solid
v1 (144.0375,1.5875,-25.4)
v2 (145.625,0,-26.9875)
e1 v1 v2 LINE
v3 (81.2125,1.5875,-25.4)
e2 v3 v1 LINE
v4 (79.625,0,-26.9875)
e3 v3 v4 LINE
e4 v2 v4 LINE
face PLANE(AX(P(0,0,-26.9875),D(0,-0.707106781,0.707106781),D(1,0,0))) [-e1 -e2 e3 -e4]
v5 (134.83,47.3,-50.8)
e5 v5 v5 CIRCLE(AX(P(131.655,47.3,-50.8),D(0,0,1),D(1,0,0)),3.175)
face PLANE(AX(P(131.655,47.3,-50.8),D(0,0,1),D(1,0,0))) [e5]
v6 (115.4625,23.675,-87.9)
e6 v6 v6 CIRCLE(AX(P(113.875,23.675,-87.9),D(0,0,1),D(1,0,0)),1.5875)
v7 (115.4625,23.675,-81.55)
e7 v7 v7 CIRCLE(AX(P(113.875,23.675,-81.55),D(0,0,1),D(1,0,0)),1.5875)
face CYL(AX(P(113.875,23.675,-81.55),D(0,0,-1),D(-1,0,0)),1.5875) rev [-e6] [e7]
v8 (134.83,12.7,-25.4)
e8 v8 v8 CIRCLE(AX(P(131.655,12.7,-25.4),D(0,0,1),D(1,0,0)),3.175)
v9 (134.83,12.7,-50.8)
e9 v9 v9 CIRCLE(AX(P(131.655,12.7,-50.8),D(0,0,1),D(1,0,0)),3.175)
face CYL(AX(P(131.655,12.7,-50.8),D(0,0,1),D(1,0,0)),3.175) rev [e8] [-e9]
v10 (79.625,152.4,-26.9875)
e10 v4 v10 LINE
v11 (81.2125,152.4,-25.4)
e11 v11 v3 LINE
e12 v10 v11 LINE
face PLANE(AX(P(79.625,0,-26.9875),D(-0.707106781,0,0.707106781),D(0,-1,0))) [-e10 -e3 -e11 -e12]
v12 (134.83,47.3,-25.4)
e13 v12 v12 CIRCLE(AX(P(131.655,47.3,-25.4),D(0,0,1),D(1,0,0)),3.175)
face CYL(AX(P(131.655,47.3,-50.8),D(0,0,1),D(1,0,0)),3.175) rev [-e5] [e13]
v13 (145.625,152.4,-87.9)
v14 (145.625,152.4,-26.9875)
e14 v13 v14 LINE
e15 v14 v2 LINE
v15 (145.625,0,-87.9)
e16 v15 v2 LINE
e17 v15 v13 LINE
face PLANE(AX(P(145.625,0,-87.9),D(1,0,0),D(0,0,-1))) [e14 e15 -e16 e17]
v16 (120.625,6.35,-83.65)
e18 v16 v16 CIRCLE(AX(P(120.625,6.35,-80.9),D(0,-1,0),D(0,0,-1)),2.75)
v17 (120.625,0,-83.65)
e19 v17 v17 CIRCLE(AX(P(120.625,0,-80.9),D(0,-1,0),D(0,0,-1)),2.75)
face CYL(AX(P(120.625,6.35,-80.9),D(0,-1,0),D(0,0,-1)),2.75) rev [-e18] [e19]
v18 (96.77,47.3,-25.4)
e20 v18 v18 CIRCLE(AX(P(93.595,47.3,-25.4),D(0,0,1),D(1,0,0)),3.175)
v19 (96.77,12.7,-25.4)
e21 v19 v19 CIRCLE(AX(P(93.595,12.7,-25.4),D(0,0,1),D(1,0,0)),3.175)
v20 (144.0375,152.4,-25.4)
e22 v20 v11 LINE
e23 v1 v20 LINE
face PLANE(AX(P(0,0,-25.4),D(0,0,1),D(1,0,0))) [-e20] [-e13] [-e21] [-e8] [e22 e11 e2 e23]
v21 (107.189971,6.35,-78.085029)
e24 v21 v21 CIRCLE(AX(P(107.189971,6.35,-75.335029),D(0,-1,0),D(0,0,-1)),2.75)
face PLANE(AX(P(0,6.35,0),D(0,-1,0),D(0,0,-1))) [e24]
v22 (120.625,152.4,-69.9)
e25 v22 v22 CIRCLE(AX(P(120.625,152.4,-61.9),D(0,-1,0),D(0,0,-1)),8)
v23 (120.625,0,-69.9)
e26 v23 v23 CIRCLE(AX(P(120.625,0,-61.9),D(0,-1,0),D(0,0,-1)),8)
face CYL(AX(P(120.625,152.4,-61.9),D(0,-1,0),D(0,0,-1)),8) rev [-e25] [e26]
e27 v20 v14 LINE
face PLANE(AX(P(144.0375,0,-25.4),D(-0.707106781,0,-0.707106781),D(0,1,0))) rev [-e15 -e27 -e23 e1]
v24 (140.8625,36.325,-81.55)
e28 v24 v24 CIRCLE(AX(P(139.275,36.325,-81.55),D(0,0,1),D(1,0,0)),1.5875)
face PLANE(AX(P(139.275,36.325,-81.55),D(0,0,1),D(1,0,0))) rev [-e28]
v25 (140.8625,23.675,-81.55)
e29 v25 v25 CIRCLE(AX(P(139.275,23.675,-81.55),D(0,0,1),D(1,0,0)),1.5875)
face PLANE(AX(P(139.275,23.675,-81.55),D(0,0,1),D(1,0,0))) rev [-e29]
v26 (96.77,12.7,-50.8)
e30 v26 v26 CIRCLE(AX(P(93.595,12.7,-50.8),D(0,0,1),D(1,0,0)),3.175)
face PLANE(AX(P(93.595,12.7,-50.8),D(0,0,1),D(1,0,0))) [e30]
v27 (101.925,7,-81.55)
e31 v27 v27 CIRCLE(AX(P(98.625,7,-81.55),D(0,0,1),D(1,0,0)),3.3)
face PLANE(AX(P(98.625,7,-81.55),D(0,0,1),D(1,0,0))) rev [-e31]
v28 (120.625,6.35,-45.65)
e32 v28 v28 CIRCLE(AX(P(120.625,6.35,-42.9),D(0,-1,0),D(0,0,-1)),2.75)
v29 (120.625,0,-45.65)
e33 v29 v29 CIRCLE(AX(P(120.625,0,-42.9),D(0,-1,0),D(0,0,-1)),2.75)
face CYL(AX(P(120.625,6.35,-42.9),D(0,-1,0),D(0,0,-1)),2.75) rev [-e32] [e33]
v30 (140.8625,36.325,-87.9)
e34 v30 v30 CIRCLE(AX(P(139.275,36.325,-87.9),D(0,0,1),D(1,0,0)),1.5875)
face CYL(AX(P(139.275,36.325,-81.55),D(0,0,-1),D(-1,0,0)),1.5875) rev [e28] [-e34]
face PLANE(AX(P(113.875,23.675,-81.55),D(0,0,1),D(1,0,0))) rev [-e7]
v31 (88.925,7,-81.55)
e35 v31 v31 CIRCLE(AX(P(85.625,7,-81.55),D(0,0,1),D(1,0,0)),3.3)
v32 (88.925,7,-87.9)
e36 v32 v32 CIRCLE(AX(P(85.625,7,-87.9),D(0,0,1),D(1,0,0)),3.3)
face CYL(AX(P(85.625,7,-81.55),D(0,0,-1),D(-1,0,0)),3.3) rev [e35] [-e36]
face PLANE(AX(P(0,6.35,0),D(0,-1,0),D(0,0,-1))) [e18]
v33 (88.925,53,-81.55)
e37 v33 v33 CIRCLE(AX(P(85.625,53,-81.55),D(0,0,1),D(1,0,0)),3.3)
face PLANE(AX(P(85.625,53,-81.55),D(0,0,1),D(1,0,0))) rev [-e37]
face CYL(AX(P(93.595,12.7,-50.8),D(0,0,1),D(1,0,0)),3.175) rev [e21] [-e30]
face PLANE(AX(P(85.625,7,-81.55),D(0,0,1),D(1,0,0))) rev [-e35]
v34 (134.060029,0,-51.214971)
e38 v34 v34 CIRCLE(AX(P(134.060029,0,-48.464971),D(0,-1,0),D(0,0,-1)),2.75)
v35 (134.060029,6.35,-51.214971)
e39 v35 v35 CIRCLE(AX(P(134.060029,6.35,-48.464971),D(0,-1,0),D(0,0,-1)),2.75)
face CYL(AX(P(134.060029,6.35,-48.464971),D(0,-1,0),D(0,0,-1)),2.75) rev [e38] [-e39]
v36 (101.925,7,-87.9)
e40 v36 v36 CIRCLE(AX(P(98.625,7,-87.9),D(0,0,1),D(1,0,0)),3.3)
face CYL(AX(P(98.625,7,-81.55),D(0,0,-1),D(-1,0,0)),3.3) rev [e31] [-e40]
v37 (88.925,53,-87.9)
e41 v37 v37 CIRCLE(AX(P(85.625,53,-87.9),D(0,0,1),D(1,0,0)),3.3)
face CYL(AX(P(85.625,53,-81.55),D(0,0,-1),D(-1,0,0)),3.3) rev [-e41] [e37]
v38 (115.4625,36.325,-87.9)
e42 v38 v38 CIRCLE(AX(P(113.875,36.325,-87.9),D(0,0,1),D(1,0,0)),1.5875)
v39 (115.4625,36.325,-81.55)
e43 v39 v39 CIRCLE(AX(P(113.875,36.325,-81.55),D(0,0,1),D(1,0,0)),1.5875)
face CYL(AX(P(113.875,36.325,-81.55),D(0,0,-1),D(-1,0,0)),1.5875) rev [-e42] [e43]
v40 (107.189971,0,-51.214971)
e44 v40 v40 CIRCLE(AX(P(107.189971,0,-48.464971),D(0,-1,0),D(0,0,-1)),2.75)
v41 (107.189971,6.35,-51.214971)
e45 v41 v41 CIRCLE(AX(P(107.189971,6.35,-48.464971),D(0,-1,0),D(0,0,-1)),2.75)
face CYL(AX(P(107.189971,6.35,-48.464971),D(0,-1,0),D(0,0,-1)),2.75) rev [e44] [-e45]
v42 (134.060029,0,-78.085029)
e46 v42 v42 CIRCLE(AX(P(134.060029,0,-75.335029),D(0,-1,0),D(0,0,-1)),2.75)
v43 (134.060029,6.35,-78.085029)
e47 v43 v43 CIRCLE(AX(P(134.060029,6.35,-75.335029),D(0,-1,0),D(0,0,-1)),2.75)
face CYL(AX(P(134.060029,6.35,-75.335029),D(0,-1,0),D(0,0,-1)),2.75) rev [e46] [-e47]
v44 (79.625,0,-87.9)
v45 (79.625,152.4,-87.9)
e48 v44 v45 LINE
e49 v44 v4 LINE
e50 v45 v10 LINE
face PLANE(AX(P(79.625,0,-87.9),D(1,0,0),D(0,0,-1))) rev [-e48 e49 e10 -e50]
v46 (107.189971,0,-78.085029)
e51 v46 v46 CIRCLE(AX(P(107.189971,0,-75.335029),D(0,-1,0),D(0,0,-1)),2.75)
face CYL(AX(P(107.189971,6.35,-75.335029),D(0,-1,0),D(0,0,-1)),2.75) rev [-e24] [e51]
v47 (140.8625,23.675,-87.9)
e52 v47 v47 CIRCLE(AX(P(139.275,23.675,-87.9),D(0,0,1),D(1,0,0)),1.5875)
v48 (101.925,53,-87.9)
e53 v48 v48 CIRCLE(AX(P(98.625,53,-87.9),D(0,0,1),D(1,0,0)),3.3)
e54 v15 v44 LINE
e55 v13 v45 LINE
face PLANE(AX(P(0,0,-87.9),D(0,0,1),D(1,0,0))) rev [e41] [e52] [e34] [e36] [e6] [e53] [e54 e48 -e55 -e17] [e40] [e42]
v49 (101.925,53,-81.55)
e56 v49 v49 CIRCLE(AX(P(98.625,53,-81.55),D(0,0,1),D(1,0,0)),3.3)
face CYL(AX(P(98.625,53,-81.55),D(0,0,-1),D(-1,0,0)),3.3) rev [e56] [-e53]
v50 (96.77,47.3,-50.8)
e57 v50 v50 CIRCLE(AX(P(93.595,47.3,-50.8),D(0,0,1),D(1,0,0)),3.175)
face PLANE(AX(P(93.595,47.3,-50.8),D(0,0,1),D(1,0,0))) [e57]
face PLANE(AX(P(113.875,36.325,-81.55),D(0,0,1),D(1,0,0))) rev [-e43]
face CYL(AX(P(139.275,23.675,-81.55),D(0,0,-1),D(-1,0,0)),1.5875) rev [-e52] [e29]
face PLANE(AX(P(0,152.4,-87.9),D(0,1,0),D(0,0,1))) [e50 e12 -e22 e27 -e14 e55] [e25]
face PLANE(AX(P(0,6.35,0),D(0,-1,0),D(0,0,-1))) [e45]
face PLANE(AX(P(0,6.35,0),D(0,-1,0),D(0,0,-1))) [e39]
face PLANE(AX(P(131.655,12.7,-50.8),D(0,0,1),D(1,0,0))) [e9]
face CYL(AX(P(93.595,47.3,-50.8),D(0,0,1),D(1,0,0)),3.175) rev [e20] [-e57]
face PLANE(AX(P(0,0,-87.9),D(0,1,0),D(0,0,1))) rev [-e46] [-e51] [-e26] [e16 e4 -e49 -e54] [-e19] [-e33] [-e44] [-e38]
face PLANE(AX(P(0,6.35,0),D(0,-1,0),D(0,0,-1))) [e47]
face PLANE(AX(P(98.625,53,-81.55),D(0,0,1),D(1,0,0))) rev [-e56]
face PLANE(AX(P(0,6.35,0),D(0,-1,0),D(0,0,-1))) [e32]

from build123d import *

# Parameters (mm, degrees)
PRIMARY_START           = -25.4
SKETCH2_W               = 66
SKETCH2_H               = 60
SKETCH2_R               = 1.5875
SKETCH2_H_2             = 92.4
PRIMARY_EXTRUSION_DEPTH = 62.5
CUT_EXTRUDE2_START      = -25.4
SKETCH3_R               = 3.175
CUT_EXTRUDE2_DEPTH      = 25.4
CUT_EXTRUDE3_START      = -87.9
SKETCH2_4_R             = 1.5875
CUT_EXTRUDE3_DEPTH      = 6.35
CHAMFER1_SIZE           = 1.5875
CUT_EXTRUDE4_DEPTH      = 6.35
CUT_EXTRUDE5_OUTLINE_R  = 8
CUT_EXTRUDE5_DEPTH      = 152.4


# Read off the part's stored shape, not the designer's step: Cut-Extrude5
with BuildPart() as part:
    # Sketch2 → Primary Extrusion (new body)
    # profile 1 of 10: a face of its own
    with BuildSketch(Plane.XY.offset(PRIMARY_START)):
        with Locations((112.625, 30)):
            Rectangle(SKETCH2_W, SKETCH2_H)
        with BuildLine():
            ThreePointArc((88.925, 7), (85.625, 3.7), (82.325, 7))
            ThreePointArc((82.325, 7), (85.625, 10.3), (88.925, 7))
        make_face(mode=Mode.SUBTRACT)
        with BuildLine():
            ThreePointArc((95.325, 7), (98.625, 10.3), (101.925, 7))
            ThreePointArc((101.925, 7), (98.625, 3.7), (95.325, 7))
        make_face(mode=Mode.SUBTRACT)
        with Locations((113.875, 23.675)):
            Circle(SKETCH2_R, mode=Mode.SUBTRACT)
        with Locations((139.275, 23.675)):
            Circle(SKETCH2_R, mode=Mode.SUBTRACT)
        with Locations((113.875, 36.325)):
            Circle(SKETCH2_R, mode=Mode.SUBTRACT)
        with Locations((139.275, 36.325)):
            Circle(SKETCH2_R, mode=Mode.SUBTRACT)
        with BuildLine():
            ThreePointArc((88.925, 53), (85.625, 49.7), (82.325, 53))
            ThreePointArc((82.325, 53), (85.625, 56.3), (88.925, 53))
        make_face(mode=Mode.SUBTRACT)
        with BuildLine():
            ThreePointArc((101.925, 53), (98.625, 49.7), (95.325, 53))
            ThreePointArc((95.325, 53), (98.625, 56.3), (101.925, 53))
        make_face(mode=Mode.SUBTRACT)
    # profile 2 of 10: a face of its own
    with BuildSketch(Plane.XY.offset(PRIMARY_START)):
        with BuildLine():
            ThreePointArc((82.325, 53), (85.625, 49.7), (88.925, 53))
            ThreePointArc((88.925, 53), (85.625, 56.3), (82.325, 53))
        make_face()
    # profile 3 of 10: a face of its own
    with BuildSketch(Plane.XY.offset(PRIMARY_START)):
        with BuildLine():
            ThreePointArc((95.325, 53), (98.625, 49.7), (101.925, 53))
            ThreePointArc((101.925, 53), (98.625, 56.3), (95.325, 53))
        make_face()
    # profile 4 of 10: a face of its own
    with BuildSketch(Plane.XY.offset(PRIMARY_START)):
        with Locations((113.875, 36.325)):
            Circle(SKETCH2_R)
    # profile 5 of 10: a face of its own
    with BuildSketch(Plane.XY.offset(PRIMARY_START)):
        with Locations((113.875, 23.675)):
            Circle(SKETCH2_R)
    # profile 6 of 10: a face of its own
    with BuildSketch(Plane.XY.offset(PRIMARY_START)):
        with Locations((139.275, 36.325)):
            Circle(SKETCH2_R)
    # profile 7 of 10: a face of its own
    with BuildSketch(Plane.XY.offset(PRIMARY_START)):
        with Locations((139.275, 23.675)):
            Circle(SKETCH2_R)
    # profile 8 of 10: a face of its own
    with BuildSketch(Plane.XY.offset(PRIMARY_START)):
        with BuildLine():
            ThreePointArc((82.325, 7), (85.625, 3.7), (88.925, 7))
            ThreePointArc((88.925, 7), (85.625, 10.3), (82.325, 7))
        make_face()
    # profile 9 of 10: a face of its own
    with BuildSketch(Plane.XY.offset(PRIMARY_START)):
        with BuildLine():
            ThreePointArc((101.925, 7), (98.625, 10.3), (95.325, 7))
            ThreePointArc((95.325, 7), (98.625, 3.7), (101.925, 7))
        make_face()
    # profile 10 of 10: a face of its own
    with BuildSketch(Plane.XY.offset(PRIMARY_START)):
        with Locations((112.625, 106.2)):
            Rectangle(SKETCH2_W, SKETCH2_H_2)
    extrude(amount=-PRIMARY_EXTRUSION_DEPTH)

    # Sketch3 → Cut-Extrude2 (cut)
    with BuildSketch(Plane.XY.offset(CUT_EXTRUDE2_START)):
        with Locations((-135.5, 47.3)):
            Circle(SKETCH3_R)
        with Locations((-135.5, 12.7)):
            Circle(SKETCH3_R)
        with Locations((93.595, 47.3)):
            Circle(SKETCH3_R)
        with Locations((131.655, 47.3)):
            Circle(SKETCH3_R)
        with Locations((131.655, 12.7)):
            Circle(SKETCH3_R)
        with Locations((93.595, 12.7)):
            Circle(SKETCH3_R)
    extrude(amount=-CUT_EXTRUDE2_DEPTH, mode=Mode.SUBTRACT)

    # Sketch2<4> → Cut-Extrude3 (cut)
    with BuildSketch(Plane.XY.offset(CUT_EXTRUDE3_START)):
        with BuildLine():
            ThreePointArc((95.325, 53), (98.625, 49.7), (101.925, 53))
            ThreePointArc((101.925, 53), (98.625, 56.3), (95.325, 53))
        make_face()
        with BuildLine():
            ThreePointArc((82.325, 53), (85.625, 49.7), (88.925, 53))
            ThreePointArc((88.925, 53), (85.625, 56.3), (82.325, 53))
        make_face()
        with BuildLine():
            ThreePointArc((101.925, 7), (98.625, 10.3), (95.325, 7))
            ThreePointArc((95.325, 7), (98.625, 3.7), (101.925, 7))
        make_face()
        with BuildLine():
            ThreePointArc((82.325, 7), (85.625, 3.7), (88.925, 7))
            ThreePointArc((88.925, 7), (85.625, 10.3), (82.325, 7))
        make_face()
        with Locations((139.275, 36.325)):
            Circle(SKETCH2_4_R)
        with Locations((113.875, 36.325)):
            Circle(SKETCH2_4_R)
        with Locations((113.875, 23.675)):
            Circle(SKETCH2_4_R)
        with Locations((139.275, 23.675)):
            Circle(SKETCH2_4_R)
    extrude(amount=CUT_EXTRUDE3_DEPTH, mode=Mode.SUBTRACT)

    # Chamfer1
    chamfer1_edges = [part.edges().sort_by_distance(p)[0] for p in [
        (112.625, 0, -25.4),
        (79.625, 76.2, -25.4),
        (145.625, 76.2, -25.4),
    ]]
    chamfer(chamfer1_edges, length=CHAMFER1_SIZE)

    # Sketch4 → Cut-Extrude4 (cut)
    with BuildSketch(Plane(origin=(0, 0, 0), x_dir=(1, 0, 0), z_dir=(0, 1, 0))):
        with BuildLine():
            ThreePointArc((131.310028843, 75.335028843), (134.060028843, 78.085028843), (136.810028843, 75.335028843))
            ThreePointArc((136.810028843, 75.335028843), (134.060028843, 72.585028843), (131.310028843, 75.335028843))
        make_face()
        with BuildLine():
            ThreePointArc((117.875, 80.9), (120.625, 83.65), (123.375, 80.9))
            ThreePointArc((123.375, 80.9), (120.625, 78.15), (117.875, 80.9))
        make_face()
        with BuildLine():
            ThreePointArc((104.439971157, 75.335028843), (107.189971157, 78.085028843), (109.939971157, 75.335028843))
            ThreePointArc((109.939971157, 75.335028843), (107.189971157, 72.585028843), (104.439971157, 75.335028843))
        make_face()
        with BuildLine():
            ThreePointArc((104.439971157, 48.464971157), (107.189971157, 51.214971157), (109.939971157, 48.464971157))
            ThreePointArc((109.939971157, 48.464971157), (107.189971157, 45.714971157), (104.439971157, 48.464971157))
        make_face()
        with BuildLine():
            ThreePointArc((123.375, 42.9), (120.625, 40.15), (117.875, 42.9))
            ThreePointArc((117.875, 42.9), (120.625, 45.65), (123.375, 42.9))
        make_face()
        with BuildLine():
            ThreePointArc((136.810028843, 48.464971157), (134.060028843, 45.714971157), (131.310028843, 48.464971157))
            ThreePointArc((131.310028843, 48.464971157), (134.060028843, 51.214971157), (136.810028843, 48.464971157))
        make_face()
    extrude(amount=CUT_EXTRUDE4_DEPTH, mode=Mode.SUBTRACT)

    # Cut-Extrude5 outline → Cut-Extrude5 (cut)
    with BuildSketch(Plane(origin=(0, 0, 0), x_dir=(1, 0, 0), z_dir=(0, 1, 0))):
        with Locations((120.625, 61.9)):
            Circle(CUT_EXTRUDE5_OUTLINE_R)
    extrude(amount=CUT_EXTRUDE5_DEPTH, mode=Mode.SUBTRACT)


solid = part.part
